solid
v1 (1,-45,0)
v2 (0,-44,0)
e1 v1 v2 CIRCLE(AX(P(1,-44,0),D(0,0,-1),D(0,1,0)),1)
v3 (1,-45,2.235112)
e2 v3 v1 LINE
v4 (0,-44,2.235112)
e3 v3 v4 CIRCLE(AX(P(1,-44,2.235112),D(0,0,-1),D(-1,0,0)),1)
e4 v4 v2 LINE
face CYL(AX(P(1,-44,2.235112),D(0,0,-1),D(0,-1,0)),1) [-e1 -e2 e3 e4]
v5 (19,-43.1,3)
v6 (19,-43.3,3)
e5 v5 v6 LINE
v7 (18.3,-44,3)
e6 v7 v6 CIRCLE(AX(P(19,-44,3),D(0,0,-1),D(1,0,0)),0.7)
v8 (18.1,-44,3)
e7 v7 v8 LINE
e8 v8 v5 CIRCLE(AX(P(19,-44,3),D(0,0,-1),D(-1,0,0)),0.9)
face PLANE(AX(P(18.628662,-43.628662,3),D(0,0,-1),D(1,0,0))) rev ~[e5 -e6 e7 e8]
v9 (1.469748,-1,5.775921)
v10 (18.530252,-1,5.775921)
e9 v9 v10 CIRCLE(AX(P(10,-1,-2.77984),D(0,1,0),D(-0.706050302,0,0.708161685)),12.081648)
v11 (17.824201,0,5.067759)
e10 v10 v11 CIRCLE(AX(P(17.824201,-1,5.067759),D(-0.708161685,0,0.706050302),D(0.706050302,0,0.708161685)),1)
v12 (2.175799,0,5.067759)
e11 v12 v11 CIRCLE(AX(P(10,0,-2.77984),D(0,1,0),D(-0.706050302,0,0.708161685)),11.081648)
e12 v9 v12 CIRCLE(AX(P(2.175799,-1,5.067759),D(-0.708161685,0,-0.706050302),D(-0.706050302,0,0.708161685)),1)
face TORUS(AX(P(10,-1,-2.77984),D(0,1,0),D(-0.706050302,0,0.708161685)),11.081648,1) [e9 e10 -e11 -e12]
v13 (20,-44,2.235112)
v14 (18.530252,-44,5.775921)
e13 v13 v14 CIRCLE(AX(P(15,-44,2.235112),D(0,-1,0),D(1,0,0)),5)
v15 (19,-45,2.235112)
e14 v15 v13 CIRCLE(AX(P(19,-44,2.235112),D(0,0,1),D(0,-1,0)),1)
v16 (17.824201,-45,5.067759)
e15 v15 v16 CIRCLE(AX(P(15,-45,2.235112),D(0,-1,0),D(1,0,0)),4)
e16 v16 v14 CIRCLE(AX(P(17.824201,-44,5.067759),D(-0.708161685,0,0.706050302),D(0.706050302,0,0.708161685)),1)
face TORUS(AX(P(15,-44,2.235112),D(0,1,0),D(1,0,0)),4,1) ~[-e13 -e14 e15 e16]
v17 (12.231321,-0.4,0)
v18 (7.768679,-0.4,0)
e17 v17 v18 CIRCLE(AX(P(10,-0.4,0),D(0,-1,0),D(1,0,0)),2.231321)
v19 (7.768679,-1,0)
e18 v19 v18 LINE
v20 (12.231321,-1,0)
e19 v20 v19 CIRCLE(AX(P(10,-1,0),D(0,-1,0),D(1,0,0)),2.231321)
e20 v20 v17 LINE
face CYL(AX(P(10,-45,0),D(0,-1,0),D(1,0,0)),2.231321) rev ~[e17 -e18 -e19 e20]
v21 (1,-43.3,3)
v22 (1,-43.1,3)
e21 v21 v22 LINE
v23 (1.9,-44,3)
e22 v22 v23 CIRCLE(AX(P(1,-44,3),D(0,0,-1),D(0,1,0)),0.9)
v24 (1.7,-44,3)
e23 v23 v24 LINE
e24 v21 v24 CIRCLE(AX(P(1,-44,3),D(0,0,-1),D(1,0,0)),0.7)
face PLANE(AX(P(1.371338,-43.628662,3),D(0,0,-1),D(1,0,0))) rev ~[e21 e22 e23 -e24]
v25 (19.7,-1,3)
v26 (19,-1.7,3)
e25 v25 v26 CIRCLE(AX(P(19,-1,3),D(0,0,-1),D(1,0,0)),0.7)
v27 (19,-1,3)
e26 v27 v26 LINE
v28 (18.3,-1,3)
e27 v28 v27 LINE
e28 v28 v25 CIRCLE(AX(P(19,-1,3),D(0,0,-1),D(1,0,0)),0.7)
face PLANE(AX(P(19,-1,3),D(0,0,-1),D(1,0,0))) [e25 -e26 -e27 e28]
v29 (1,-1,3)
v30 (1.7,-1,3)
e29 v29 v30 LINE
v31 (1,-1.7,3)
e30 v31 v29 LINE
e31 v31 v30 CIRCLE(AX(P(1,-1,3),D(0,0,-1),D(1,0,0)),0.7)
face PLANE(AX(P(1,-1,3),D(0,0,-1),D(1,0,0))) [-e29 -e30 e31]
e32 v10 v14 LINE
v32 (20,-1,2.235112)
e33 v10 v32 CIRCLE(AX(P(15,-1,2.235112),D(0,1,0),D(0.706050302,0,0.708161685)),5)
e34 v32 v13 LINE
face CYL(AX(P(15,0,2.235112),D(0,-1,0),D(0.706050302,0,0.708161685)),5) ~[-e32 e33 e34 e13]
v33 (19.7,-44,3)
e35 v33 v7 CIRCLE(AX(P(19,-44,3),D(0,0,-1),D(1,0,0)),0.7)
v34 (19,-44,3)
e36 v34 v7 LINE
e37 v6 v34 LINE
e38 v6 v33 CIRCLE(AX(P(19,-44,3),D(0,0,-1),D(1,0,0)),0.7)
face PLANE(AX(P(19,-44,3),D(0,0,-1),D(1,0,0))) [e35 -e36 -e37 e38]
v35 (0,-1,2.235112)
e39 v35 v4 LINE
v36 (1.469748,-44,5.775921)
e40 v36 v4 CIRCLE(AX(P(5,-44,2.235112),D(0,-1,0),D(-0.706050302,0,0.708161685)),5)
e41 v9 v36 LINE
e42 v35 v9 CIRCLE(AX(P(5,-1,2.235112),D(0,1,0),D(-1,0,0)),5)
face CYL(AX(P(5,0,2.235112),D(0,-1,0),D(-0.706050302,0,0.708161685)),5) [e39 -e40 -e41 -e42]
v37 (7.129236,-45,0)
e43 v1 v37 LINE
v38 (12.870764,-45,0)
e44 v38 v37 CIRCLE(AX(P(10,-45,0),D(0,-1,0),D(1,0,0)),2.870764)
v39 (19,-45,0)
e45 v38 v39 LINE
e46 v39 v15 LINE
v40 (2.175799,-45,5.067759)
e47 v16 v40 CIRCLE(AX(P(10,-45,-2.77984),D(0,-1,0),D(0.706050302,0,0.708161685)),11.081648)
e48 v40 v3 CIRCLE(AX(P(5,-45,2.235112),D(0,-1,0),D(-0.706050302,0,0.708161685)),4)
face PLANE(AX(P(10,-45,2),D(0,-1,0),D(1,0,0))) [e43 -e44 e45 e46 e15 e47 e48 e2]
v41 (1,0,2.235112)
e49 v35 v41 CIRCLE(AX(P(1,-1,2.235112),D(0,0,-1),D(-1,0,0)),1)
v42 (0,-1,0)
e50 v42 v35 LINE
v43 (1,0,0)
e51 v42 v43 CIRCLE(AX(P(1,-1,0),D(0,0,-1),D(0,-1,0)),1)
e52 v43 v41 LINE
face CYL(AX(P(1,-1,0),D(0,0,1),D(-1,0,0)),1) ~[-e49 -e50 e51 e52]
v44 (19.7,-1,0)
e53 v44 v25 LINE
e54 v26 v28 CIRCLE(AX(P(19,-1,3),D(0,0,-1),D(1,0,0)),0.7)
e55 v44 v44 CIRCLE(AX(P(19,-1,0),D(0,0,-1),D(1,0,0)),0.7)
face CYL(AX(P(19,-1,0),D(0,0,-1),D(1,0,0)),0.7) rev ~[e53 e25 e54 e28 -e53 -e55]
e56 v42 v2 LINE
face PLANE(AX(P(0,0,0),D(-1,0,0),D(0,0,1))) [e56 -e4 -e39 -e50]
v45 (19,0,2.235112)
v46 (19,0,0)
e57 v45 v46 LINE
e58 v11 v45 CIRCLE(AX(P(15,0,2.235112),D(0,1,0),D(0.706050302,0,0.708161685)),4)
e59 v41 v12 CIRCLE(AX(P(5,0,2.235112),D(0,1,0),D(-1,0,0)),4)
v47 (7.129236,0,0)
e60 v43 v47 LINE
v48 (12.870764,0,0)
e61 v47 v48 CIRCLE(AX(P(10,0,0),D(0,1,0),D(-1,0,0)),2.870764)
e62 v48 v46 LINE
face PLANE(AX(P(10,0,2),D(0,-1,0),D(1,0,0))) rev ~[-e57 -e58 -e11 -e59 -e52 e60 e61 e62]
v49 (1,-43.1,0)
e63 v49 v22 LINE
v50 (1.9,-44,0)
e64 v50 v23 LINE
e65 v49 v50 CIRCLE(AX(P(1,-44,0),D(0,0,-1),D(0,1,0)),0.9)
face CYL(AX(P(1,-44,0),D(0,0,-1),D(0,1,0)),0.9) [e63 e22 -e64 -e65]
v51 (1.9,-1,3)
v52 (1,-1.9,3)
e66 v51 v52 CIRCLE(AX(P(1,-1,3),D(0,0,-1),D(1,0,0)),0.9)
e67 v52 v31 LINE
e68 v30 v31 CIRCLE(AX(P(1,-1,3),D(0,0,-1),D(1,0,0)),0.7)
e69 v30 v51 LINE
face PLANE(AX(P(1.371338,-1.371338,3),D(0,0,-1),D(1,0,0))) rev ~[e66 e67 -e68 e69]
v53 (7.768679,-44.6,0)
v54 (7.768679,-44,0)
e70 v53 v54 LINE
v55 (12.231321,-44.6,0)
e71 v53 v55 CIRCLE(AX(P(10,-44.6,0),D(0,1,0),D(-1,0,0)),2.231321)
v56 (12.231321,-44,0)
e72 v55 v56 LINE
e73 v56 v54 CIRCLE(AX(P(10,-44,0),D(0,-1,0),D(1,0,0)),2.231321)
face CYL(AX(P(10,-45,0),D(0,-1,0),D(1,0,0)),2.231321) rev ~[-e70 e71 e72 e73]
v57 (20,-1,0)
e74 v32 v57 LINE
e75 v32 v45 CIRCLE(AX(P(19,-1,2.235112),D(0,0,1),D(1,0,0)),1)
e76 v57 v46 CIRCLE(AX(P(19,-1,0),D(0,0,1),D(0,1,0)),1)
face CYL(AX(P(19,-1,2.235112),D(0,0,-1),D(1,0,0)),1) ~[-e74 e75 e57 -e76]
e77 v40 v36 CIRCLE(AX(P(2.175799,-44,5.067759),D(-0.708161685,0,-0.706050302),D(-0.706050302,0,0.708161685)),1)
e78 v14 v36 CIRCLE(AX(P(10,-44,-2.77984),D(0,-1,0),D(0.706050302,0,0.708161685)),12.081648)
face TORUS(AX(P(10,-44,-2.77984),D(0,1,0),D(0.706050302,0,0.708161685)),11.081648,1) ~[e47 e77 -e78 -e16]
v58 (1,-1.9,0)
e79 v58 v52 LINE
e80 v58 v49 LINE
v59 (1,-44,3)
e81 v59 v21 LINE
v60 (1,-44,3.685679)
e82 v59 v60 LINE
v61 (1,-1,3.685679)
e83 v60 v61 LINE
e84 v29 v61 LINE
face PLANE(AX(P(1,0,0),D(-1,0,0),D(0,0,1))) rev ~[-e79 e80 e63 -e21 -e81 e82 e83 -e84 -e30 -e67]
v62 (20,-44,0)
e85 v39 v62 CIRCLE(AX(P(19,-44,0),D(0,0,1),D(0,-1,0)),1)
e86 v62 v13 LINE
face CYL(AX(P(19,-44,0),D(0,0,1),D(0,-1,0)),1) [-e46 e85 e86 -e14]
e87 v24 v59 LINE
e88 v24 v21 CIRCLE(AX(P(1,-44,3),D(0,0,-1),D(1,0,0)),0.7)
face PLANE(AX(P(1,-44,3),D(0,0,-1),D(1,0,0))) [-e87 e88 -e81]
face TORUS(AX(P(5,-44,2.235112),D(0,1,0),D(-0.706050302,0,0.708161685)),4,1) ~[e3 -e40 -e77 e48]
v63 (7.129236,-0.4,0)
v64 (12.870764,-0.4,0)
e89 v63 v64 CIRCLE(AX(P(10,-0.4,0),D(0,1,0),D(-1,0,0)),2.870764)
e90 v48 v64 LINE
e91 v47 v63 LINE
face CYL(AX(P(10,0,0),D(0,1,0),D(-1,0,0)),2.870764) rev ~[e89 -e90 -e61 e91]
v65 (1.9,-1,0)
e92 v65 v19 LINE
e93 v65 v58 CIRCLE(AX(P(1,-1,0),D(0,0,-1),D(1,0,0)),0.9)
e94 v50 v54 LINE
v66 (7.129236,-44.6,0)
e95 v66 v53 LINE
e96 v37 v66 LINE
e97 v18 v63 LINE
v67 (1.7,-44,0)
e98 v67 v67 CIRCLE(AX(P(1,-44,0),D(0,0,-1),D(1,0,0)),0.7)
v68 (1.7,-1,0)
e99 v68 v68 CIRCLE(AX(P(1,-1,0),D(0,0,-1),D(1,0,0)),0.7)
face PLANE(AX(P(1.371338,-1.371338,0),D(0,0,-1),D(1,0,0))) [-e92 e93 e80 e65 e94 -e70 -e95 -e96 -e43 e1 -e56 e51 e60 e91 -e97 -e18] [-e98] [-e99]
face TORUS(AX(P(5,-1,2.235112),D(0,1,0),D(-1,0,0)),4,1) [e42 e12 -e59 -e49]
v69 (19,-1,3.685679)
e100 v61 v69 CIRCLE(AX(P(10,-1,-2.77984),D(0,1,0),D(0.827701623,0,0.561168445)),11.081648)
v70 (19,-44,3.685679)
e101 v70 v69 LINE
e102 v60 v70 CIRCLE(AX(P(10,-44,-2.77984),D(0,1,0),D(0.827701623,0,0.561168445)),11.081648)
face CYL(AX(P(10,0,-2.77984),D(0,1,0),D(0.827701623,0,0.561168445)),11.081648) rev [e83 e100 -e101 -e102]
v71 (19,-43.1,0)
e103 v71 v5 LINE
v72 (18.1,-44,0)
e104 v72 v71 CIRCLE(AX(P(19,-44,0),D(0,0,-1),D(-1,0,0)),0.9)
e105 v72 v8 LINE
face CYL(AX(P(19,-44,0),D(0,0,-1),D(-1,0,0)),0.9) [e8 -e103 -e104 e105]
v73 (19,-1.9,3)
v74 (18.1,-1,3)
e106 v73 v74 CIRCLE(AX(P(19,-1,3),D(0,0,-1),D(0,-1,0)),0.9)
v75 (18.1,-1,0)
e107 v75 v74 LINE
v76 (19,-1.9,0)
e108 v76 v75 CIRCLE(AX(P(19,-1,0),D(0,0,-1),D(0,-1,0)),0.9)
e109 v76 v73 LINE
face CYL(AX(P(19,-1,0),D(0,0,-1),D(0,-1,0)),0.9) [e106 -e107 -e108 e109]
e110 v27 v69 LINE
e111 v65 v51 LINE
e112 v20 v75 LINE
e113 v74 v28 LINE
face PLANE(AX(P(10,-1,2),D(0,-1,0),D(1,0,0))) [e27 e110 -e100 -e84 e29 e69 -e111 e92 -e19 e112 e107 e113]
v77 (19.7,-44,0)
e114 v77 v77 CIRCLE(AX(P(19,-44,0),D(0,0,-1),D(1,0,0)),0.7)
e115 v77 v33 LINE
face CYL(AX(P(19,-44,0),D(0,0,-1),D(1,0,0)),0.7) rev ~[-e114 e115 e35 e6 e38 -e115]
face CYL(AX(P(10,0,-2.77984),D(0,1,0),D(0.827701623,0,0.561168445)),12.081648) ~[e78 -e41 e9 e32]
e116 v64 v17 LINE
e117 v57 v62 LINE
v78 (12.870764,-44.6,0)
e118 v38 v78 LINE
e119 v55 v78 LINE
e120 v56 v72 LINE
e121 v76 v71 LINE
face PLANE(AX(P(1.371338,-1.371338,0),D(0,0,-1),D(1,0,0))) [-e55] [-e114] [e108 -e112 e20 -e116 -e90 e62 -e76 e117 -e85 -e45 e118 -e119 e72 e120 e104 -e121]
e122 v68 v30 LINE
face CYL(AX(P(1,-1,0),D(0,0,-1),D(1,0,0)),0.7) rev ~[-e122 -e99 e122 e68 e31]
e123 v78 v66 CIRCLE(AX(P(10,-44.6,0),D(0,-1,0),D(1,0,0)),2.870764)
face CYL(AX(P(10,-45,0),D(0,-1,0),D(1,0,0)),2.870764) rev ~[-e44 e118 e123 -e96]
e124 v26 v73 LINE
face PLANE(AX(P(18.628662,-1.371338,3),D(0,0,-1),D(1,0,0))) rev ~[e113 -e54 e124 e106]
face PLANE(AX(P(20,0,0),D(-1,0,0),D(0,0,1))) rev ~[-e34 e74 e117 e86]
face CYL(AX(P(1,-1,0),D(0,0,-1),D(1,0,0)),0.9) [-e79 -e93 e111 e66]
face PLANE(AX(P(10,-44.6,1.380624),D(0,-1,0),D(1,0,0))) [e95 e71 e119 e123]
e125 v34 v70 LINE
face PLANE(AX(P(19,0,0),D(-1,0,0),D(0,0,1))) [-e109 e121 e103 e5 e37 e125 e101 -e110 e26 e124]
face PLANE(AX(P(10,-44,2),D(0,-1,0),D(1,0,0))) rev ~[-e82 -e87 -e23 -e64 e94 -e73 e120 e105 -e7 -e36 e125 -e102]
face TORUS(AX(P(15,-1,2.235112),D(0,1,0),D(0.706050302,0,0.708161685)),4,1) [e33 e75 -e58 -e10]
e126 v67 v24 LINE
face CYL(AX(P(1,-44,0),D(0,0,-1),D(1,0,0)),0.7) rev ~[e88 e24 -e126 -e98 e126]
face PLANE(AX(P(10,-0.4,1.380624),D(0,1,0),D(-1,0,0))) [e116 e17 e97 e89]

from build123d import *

# Parameters (mm, degrees)
F0_W      = 20
F0_H      = 4
F1_DEPTH  = 45
F2_T      = -1
F3_R      = 5
F4_R      = 5
F6_DEPTH  = 3
F7_R      = 0.7
F8_DEPTH  = 3
F9_R      = 1
F10_R     = 1
F12_DEPTH = 50
F13_DEPTH = 0.4
F15_DEPTH = 0.4


with BuildPart() as f1:
    # F0 (on Front) → F1 (new body)
    with BuildSketch(Plane.XZ):
        with Locations((10, 2)):
            Rectangle(F0_W, F0_H)
        with BuildLine():
            ThreePointArc((20, 4), (10, 9.301808562), (0, 4))
            Line((0, 4), (20, 4))
        make_face()
    extrude(amount=F1_DEPTH)

    # F2
    f2_openings = [f1.faces().sort_by_distance(p)[0] for p in [
        (10, -22.5, 0),
    ]]
    offset(amount=F2_T, openings=f2_openings)

    # F3
    f3_edges = [f1.edges().sort_by_distance(p)[0] for p in [
        (0, -22.5, 4),
    ]]
    fillet(f3_edges, radius=F3_R)

    # F4
    f4_edges = [f1.edges().sort_by_distance(p)[0] for p in [
        (20, -22.5, 4),
    ]]
    fillet(f4_edges, radius=F4_R)

    # F5 (on face) → F6 (join)
    with BuildSketch(Plane(origin=(0, 0, 0), x_dir=(1, 0, 0), z_dir=(0, 0, -1))):
        with BuildLine():
            Line((1, 1), (1.9, 1))
            ThreePointArc((1.9, 1), (1.6363961031, 1.6363961031), (1, 1.9))
            Line((1, 1.9), (1, 1))
        make_face()
        with BuildLine():
            ThreePointArc((19, 1.9), (18.3636038969, 1.6363961031), (18.1, 1))
            Line((18.1, 1), (19, 1))
            Line((19, 1), (19, 1.9))
        make_face()
        with BuildLine():
            ThreePointArc((18.1, 44), (18.3636038969, 43.3636038969), (19, 43.1))
            Line((19, 43.1), (19, 44))
            Line((19, 44), (18.1, 44))
        make_face()
        with BuildLine():
            Line((1, 44), (1, 43.1))
            ThreePointArc((1, 43.1), (1.6363961031, 43.3636038969), (1.9, 44))
            Line((1.9, 44), (1, 44))
        make_face()
    extrude(amount=-F6_DEPTH)

    # F7 (on face) → F8 (cut)
    with BuildSketch(Plane(origin=(0, 0, 0), x_dir=(1, 0, 0), z_dir=(0, 0, -1))):
        with Locations((1, 1)):
            Circle(F7_R)
        with Locations((19, 1)):
            Circle(F7_R)
        with Locations((1, 44)):
            Circle(F7_R)
        with Locations((19, 44)):
            Circle(F7_R)
    extrude(amount=-F8_DEPTH, mode=Mode.SUBTRACT)

    # F9
    f9_edges = [f1.edges().sort_by_distance(p)[0] for p in [
        (20, -45, 1.117556),
        (19.617968, -45, 4.151977),
        (10, -45, 9.301809),
        (0.382032, -45, 4.151977),
        (0, -45, 1.117556),
    ]]
    fillet(f9_edges, radius=F9_R)

    # F10
    f10_edges = [f1.edges().sort_by_distance(p)[0] for p in [
        (0, 0, 1.117556),
        (0.382032, 0, 4.151977),
        (10, 0, 9.301809),
        (19.617968, 0, 4.151977),
        (20, 0, 1.117556),
    ]]
    fillet(f10_edges, radius=F10_R)

    # F11 (on face) → F12 (cut)
    with BuildSketch(Plane.XZ.offset(45)):
        with BuildLine():
            Line((7.7686794017, 0), (12.2313205983, 0))
            ThreePointArc((12.2313205983, 0), (10, 2.2313205983), (7.7686794017, 0))
        make_face()
    extrude(amount=-F12_DEPTH, mode=Mode.SUBTRACT)

    # F11 (on face) → F13 (cut)
    with BuildSketch(Plane.XZ.offset(45)):
        with BuildLine():
            Line((12.2313205983, 0), (12.8707642747, 0))
            ThreePointArc((12.8707642747, 0), (10, 2.8707642747), (7.1292357253, 0))
            Line((7.1292357253, 0), (7.7686794017, 0))
            ThreePointArc((7.7686794017, 0), (10, 2.2313205983), (12.2313205983, 0))
        make_face()
    extrude(amount=-F13_DEPTH, mode=Mode.SUBTRACT)

    # F14 (on face) → F15 (cut)
    with BuildSketch(Plane(origin=(0, 0, 0), x_dir=(-1, 0, 0), z_dir=(0, 1, 0))):
        with BuildLine():
            Line((-7.7686794017, 0), (-7.1292357253, 0))
            ThreePointArc((-7.1292357253, 0), (-10, 2.8707642747), (-12.8707642747, 0))
            Line((-12.8707642747, 0), (-12.2313205983, 0))
            ThreePointArc((-12.2313205983, 0), (-10, 2.2313205983), (-7.7686794017, 0))
        make_face()
    extrude(amount=-F15_DEPTH, mode=Mode.SUBTRACT)


solid = f1.part
